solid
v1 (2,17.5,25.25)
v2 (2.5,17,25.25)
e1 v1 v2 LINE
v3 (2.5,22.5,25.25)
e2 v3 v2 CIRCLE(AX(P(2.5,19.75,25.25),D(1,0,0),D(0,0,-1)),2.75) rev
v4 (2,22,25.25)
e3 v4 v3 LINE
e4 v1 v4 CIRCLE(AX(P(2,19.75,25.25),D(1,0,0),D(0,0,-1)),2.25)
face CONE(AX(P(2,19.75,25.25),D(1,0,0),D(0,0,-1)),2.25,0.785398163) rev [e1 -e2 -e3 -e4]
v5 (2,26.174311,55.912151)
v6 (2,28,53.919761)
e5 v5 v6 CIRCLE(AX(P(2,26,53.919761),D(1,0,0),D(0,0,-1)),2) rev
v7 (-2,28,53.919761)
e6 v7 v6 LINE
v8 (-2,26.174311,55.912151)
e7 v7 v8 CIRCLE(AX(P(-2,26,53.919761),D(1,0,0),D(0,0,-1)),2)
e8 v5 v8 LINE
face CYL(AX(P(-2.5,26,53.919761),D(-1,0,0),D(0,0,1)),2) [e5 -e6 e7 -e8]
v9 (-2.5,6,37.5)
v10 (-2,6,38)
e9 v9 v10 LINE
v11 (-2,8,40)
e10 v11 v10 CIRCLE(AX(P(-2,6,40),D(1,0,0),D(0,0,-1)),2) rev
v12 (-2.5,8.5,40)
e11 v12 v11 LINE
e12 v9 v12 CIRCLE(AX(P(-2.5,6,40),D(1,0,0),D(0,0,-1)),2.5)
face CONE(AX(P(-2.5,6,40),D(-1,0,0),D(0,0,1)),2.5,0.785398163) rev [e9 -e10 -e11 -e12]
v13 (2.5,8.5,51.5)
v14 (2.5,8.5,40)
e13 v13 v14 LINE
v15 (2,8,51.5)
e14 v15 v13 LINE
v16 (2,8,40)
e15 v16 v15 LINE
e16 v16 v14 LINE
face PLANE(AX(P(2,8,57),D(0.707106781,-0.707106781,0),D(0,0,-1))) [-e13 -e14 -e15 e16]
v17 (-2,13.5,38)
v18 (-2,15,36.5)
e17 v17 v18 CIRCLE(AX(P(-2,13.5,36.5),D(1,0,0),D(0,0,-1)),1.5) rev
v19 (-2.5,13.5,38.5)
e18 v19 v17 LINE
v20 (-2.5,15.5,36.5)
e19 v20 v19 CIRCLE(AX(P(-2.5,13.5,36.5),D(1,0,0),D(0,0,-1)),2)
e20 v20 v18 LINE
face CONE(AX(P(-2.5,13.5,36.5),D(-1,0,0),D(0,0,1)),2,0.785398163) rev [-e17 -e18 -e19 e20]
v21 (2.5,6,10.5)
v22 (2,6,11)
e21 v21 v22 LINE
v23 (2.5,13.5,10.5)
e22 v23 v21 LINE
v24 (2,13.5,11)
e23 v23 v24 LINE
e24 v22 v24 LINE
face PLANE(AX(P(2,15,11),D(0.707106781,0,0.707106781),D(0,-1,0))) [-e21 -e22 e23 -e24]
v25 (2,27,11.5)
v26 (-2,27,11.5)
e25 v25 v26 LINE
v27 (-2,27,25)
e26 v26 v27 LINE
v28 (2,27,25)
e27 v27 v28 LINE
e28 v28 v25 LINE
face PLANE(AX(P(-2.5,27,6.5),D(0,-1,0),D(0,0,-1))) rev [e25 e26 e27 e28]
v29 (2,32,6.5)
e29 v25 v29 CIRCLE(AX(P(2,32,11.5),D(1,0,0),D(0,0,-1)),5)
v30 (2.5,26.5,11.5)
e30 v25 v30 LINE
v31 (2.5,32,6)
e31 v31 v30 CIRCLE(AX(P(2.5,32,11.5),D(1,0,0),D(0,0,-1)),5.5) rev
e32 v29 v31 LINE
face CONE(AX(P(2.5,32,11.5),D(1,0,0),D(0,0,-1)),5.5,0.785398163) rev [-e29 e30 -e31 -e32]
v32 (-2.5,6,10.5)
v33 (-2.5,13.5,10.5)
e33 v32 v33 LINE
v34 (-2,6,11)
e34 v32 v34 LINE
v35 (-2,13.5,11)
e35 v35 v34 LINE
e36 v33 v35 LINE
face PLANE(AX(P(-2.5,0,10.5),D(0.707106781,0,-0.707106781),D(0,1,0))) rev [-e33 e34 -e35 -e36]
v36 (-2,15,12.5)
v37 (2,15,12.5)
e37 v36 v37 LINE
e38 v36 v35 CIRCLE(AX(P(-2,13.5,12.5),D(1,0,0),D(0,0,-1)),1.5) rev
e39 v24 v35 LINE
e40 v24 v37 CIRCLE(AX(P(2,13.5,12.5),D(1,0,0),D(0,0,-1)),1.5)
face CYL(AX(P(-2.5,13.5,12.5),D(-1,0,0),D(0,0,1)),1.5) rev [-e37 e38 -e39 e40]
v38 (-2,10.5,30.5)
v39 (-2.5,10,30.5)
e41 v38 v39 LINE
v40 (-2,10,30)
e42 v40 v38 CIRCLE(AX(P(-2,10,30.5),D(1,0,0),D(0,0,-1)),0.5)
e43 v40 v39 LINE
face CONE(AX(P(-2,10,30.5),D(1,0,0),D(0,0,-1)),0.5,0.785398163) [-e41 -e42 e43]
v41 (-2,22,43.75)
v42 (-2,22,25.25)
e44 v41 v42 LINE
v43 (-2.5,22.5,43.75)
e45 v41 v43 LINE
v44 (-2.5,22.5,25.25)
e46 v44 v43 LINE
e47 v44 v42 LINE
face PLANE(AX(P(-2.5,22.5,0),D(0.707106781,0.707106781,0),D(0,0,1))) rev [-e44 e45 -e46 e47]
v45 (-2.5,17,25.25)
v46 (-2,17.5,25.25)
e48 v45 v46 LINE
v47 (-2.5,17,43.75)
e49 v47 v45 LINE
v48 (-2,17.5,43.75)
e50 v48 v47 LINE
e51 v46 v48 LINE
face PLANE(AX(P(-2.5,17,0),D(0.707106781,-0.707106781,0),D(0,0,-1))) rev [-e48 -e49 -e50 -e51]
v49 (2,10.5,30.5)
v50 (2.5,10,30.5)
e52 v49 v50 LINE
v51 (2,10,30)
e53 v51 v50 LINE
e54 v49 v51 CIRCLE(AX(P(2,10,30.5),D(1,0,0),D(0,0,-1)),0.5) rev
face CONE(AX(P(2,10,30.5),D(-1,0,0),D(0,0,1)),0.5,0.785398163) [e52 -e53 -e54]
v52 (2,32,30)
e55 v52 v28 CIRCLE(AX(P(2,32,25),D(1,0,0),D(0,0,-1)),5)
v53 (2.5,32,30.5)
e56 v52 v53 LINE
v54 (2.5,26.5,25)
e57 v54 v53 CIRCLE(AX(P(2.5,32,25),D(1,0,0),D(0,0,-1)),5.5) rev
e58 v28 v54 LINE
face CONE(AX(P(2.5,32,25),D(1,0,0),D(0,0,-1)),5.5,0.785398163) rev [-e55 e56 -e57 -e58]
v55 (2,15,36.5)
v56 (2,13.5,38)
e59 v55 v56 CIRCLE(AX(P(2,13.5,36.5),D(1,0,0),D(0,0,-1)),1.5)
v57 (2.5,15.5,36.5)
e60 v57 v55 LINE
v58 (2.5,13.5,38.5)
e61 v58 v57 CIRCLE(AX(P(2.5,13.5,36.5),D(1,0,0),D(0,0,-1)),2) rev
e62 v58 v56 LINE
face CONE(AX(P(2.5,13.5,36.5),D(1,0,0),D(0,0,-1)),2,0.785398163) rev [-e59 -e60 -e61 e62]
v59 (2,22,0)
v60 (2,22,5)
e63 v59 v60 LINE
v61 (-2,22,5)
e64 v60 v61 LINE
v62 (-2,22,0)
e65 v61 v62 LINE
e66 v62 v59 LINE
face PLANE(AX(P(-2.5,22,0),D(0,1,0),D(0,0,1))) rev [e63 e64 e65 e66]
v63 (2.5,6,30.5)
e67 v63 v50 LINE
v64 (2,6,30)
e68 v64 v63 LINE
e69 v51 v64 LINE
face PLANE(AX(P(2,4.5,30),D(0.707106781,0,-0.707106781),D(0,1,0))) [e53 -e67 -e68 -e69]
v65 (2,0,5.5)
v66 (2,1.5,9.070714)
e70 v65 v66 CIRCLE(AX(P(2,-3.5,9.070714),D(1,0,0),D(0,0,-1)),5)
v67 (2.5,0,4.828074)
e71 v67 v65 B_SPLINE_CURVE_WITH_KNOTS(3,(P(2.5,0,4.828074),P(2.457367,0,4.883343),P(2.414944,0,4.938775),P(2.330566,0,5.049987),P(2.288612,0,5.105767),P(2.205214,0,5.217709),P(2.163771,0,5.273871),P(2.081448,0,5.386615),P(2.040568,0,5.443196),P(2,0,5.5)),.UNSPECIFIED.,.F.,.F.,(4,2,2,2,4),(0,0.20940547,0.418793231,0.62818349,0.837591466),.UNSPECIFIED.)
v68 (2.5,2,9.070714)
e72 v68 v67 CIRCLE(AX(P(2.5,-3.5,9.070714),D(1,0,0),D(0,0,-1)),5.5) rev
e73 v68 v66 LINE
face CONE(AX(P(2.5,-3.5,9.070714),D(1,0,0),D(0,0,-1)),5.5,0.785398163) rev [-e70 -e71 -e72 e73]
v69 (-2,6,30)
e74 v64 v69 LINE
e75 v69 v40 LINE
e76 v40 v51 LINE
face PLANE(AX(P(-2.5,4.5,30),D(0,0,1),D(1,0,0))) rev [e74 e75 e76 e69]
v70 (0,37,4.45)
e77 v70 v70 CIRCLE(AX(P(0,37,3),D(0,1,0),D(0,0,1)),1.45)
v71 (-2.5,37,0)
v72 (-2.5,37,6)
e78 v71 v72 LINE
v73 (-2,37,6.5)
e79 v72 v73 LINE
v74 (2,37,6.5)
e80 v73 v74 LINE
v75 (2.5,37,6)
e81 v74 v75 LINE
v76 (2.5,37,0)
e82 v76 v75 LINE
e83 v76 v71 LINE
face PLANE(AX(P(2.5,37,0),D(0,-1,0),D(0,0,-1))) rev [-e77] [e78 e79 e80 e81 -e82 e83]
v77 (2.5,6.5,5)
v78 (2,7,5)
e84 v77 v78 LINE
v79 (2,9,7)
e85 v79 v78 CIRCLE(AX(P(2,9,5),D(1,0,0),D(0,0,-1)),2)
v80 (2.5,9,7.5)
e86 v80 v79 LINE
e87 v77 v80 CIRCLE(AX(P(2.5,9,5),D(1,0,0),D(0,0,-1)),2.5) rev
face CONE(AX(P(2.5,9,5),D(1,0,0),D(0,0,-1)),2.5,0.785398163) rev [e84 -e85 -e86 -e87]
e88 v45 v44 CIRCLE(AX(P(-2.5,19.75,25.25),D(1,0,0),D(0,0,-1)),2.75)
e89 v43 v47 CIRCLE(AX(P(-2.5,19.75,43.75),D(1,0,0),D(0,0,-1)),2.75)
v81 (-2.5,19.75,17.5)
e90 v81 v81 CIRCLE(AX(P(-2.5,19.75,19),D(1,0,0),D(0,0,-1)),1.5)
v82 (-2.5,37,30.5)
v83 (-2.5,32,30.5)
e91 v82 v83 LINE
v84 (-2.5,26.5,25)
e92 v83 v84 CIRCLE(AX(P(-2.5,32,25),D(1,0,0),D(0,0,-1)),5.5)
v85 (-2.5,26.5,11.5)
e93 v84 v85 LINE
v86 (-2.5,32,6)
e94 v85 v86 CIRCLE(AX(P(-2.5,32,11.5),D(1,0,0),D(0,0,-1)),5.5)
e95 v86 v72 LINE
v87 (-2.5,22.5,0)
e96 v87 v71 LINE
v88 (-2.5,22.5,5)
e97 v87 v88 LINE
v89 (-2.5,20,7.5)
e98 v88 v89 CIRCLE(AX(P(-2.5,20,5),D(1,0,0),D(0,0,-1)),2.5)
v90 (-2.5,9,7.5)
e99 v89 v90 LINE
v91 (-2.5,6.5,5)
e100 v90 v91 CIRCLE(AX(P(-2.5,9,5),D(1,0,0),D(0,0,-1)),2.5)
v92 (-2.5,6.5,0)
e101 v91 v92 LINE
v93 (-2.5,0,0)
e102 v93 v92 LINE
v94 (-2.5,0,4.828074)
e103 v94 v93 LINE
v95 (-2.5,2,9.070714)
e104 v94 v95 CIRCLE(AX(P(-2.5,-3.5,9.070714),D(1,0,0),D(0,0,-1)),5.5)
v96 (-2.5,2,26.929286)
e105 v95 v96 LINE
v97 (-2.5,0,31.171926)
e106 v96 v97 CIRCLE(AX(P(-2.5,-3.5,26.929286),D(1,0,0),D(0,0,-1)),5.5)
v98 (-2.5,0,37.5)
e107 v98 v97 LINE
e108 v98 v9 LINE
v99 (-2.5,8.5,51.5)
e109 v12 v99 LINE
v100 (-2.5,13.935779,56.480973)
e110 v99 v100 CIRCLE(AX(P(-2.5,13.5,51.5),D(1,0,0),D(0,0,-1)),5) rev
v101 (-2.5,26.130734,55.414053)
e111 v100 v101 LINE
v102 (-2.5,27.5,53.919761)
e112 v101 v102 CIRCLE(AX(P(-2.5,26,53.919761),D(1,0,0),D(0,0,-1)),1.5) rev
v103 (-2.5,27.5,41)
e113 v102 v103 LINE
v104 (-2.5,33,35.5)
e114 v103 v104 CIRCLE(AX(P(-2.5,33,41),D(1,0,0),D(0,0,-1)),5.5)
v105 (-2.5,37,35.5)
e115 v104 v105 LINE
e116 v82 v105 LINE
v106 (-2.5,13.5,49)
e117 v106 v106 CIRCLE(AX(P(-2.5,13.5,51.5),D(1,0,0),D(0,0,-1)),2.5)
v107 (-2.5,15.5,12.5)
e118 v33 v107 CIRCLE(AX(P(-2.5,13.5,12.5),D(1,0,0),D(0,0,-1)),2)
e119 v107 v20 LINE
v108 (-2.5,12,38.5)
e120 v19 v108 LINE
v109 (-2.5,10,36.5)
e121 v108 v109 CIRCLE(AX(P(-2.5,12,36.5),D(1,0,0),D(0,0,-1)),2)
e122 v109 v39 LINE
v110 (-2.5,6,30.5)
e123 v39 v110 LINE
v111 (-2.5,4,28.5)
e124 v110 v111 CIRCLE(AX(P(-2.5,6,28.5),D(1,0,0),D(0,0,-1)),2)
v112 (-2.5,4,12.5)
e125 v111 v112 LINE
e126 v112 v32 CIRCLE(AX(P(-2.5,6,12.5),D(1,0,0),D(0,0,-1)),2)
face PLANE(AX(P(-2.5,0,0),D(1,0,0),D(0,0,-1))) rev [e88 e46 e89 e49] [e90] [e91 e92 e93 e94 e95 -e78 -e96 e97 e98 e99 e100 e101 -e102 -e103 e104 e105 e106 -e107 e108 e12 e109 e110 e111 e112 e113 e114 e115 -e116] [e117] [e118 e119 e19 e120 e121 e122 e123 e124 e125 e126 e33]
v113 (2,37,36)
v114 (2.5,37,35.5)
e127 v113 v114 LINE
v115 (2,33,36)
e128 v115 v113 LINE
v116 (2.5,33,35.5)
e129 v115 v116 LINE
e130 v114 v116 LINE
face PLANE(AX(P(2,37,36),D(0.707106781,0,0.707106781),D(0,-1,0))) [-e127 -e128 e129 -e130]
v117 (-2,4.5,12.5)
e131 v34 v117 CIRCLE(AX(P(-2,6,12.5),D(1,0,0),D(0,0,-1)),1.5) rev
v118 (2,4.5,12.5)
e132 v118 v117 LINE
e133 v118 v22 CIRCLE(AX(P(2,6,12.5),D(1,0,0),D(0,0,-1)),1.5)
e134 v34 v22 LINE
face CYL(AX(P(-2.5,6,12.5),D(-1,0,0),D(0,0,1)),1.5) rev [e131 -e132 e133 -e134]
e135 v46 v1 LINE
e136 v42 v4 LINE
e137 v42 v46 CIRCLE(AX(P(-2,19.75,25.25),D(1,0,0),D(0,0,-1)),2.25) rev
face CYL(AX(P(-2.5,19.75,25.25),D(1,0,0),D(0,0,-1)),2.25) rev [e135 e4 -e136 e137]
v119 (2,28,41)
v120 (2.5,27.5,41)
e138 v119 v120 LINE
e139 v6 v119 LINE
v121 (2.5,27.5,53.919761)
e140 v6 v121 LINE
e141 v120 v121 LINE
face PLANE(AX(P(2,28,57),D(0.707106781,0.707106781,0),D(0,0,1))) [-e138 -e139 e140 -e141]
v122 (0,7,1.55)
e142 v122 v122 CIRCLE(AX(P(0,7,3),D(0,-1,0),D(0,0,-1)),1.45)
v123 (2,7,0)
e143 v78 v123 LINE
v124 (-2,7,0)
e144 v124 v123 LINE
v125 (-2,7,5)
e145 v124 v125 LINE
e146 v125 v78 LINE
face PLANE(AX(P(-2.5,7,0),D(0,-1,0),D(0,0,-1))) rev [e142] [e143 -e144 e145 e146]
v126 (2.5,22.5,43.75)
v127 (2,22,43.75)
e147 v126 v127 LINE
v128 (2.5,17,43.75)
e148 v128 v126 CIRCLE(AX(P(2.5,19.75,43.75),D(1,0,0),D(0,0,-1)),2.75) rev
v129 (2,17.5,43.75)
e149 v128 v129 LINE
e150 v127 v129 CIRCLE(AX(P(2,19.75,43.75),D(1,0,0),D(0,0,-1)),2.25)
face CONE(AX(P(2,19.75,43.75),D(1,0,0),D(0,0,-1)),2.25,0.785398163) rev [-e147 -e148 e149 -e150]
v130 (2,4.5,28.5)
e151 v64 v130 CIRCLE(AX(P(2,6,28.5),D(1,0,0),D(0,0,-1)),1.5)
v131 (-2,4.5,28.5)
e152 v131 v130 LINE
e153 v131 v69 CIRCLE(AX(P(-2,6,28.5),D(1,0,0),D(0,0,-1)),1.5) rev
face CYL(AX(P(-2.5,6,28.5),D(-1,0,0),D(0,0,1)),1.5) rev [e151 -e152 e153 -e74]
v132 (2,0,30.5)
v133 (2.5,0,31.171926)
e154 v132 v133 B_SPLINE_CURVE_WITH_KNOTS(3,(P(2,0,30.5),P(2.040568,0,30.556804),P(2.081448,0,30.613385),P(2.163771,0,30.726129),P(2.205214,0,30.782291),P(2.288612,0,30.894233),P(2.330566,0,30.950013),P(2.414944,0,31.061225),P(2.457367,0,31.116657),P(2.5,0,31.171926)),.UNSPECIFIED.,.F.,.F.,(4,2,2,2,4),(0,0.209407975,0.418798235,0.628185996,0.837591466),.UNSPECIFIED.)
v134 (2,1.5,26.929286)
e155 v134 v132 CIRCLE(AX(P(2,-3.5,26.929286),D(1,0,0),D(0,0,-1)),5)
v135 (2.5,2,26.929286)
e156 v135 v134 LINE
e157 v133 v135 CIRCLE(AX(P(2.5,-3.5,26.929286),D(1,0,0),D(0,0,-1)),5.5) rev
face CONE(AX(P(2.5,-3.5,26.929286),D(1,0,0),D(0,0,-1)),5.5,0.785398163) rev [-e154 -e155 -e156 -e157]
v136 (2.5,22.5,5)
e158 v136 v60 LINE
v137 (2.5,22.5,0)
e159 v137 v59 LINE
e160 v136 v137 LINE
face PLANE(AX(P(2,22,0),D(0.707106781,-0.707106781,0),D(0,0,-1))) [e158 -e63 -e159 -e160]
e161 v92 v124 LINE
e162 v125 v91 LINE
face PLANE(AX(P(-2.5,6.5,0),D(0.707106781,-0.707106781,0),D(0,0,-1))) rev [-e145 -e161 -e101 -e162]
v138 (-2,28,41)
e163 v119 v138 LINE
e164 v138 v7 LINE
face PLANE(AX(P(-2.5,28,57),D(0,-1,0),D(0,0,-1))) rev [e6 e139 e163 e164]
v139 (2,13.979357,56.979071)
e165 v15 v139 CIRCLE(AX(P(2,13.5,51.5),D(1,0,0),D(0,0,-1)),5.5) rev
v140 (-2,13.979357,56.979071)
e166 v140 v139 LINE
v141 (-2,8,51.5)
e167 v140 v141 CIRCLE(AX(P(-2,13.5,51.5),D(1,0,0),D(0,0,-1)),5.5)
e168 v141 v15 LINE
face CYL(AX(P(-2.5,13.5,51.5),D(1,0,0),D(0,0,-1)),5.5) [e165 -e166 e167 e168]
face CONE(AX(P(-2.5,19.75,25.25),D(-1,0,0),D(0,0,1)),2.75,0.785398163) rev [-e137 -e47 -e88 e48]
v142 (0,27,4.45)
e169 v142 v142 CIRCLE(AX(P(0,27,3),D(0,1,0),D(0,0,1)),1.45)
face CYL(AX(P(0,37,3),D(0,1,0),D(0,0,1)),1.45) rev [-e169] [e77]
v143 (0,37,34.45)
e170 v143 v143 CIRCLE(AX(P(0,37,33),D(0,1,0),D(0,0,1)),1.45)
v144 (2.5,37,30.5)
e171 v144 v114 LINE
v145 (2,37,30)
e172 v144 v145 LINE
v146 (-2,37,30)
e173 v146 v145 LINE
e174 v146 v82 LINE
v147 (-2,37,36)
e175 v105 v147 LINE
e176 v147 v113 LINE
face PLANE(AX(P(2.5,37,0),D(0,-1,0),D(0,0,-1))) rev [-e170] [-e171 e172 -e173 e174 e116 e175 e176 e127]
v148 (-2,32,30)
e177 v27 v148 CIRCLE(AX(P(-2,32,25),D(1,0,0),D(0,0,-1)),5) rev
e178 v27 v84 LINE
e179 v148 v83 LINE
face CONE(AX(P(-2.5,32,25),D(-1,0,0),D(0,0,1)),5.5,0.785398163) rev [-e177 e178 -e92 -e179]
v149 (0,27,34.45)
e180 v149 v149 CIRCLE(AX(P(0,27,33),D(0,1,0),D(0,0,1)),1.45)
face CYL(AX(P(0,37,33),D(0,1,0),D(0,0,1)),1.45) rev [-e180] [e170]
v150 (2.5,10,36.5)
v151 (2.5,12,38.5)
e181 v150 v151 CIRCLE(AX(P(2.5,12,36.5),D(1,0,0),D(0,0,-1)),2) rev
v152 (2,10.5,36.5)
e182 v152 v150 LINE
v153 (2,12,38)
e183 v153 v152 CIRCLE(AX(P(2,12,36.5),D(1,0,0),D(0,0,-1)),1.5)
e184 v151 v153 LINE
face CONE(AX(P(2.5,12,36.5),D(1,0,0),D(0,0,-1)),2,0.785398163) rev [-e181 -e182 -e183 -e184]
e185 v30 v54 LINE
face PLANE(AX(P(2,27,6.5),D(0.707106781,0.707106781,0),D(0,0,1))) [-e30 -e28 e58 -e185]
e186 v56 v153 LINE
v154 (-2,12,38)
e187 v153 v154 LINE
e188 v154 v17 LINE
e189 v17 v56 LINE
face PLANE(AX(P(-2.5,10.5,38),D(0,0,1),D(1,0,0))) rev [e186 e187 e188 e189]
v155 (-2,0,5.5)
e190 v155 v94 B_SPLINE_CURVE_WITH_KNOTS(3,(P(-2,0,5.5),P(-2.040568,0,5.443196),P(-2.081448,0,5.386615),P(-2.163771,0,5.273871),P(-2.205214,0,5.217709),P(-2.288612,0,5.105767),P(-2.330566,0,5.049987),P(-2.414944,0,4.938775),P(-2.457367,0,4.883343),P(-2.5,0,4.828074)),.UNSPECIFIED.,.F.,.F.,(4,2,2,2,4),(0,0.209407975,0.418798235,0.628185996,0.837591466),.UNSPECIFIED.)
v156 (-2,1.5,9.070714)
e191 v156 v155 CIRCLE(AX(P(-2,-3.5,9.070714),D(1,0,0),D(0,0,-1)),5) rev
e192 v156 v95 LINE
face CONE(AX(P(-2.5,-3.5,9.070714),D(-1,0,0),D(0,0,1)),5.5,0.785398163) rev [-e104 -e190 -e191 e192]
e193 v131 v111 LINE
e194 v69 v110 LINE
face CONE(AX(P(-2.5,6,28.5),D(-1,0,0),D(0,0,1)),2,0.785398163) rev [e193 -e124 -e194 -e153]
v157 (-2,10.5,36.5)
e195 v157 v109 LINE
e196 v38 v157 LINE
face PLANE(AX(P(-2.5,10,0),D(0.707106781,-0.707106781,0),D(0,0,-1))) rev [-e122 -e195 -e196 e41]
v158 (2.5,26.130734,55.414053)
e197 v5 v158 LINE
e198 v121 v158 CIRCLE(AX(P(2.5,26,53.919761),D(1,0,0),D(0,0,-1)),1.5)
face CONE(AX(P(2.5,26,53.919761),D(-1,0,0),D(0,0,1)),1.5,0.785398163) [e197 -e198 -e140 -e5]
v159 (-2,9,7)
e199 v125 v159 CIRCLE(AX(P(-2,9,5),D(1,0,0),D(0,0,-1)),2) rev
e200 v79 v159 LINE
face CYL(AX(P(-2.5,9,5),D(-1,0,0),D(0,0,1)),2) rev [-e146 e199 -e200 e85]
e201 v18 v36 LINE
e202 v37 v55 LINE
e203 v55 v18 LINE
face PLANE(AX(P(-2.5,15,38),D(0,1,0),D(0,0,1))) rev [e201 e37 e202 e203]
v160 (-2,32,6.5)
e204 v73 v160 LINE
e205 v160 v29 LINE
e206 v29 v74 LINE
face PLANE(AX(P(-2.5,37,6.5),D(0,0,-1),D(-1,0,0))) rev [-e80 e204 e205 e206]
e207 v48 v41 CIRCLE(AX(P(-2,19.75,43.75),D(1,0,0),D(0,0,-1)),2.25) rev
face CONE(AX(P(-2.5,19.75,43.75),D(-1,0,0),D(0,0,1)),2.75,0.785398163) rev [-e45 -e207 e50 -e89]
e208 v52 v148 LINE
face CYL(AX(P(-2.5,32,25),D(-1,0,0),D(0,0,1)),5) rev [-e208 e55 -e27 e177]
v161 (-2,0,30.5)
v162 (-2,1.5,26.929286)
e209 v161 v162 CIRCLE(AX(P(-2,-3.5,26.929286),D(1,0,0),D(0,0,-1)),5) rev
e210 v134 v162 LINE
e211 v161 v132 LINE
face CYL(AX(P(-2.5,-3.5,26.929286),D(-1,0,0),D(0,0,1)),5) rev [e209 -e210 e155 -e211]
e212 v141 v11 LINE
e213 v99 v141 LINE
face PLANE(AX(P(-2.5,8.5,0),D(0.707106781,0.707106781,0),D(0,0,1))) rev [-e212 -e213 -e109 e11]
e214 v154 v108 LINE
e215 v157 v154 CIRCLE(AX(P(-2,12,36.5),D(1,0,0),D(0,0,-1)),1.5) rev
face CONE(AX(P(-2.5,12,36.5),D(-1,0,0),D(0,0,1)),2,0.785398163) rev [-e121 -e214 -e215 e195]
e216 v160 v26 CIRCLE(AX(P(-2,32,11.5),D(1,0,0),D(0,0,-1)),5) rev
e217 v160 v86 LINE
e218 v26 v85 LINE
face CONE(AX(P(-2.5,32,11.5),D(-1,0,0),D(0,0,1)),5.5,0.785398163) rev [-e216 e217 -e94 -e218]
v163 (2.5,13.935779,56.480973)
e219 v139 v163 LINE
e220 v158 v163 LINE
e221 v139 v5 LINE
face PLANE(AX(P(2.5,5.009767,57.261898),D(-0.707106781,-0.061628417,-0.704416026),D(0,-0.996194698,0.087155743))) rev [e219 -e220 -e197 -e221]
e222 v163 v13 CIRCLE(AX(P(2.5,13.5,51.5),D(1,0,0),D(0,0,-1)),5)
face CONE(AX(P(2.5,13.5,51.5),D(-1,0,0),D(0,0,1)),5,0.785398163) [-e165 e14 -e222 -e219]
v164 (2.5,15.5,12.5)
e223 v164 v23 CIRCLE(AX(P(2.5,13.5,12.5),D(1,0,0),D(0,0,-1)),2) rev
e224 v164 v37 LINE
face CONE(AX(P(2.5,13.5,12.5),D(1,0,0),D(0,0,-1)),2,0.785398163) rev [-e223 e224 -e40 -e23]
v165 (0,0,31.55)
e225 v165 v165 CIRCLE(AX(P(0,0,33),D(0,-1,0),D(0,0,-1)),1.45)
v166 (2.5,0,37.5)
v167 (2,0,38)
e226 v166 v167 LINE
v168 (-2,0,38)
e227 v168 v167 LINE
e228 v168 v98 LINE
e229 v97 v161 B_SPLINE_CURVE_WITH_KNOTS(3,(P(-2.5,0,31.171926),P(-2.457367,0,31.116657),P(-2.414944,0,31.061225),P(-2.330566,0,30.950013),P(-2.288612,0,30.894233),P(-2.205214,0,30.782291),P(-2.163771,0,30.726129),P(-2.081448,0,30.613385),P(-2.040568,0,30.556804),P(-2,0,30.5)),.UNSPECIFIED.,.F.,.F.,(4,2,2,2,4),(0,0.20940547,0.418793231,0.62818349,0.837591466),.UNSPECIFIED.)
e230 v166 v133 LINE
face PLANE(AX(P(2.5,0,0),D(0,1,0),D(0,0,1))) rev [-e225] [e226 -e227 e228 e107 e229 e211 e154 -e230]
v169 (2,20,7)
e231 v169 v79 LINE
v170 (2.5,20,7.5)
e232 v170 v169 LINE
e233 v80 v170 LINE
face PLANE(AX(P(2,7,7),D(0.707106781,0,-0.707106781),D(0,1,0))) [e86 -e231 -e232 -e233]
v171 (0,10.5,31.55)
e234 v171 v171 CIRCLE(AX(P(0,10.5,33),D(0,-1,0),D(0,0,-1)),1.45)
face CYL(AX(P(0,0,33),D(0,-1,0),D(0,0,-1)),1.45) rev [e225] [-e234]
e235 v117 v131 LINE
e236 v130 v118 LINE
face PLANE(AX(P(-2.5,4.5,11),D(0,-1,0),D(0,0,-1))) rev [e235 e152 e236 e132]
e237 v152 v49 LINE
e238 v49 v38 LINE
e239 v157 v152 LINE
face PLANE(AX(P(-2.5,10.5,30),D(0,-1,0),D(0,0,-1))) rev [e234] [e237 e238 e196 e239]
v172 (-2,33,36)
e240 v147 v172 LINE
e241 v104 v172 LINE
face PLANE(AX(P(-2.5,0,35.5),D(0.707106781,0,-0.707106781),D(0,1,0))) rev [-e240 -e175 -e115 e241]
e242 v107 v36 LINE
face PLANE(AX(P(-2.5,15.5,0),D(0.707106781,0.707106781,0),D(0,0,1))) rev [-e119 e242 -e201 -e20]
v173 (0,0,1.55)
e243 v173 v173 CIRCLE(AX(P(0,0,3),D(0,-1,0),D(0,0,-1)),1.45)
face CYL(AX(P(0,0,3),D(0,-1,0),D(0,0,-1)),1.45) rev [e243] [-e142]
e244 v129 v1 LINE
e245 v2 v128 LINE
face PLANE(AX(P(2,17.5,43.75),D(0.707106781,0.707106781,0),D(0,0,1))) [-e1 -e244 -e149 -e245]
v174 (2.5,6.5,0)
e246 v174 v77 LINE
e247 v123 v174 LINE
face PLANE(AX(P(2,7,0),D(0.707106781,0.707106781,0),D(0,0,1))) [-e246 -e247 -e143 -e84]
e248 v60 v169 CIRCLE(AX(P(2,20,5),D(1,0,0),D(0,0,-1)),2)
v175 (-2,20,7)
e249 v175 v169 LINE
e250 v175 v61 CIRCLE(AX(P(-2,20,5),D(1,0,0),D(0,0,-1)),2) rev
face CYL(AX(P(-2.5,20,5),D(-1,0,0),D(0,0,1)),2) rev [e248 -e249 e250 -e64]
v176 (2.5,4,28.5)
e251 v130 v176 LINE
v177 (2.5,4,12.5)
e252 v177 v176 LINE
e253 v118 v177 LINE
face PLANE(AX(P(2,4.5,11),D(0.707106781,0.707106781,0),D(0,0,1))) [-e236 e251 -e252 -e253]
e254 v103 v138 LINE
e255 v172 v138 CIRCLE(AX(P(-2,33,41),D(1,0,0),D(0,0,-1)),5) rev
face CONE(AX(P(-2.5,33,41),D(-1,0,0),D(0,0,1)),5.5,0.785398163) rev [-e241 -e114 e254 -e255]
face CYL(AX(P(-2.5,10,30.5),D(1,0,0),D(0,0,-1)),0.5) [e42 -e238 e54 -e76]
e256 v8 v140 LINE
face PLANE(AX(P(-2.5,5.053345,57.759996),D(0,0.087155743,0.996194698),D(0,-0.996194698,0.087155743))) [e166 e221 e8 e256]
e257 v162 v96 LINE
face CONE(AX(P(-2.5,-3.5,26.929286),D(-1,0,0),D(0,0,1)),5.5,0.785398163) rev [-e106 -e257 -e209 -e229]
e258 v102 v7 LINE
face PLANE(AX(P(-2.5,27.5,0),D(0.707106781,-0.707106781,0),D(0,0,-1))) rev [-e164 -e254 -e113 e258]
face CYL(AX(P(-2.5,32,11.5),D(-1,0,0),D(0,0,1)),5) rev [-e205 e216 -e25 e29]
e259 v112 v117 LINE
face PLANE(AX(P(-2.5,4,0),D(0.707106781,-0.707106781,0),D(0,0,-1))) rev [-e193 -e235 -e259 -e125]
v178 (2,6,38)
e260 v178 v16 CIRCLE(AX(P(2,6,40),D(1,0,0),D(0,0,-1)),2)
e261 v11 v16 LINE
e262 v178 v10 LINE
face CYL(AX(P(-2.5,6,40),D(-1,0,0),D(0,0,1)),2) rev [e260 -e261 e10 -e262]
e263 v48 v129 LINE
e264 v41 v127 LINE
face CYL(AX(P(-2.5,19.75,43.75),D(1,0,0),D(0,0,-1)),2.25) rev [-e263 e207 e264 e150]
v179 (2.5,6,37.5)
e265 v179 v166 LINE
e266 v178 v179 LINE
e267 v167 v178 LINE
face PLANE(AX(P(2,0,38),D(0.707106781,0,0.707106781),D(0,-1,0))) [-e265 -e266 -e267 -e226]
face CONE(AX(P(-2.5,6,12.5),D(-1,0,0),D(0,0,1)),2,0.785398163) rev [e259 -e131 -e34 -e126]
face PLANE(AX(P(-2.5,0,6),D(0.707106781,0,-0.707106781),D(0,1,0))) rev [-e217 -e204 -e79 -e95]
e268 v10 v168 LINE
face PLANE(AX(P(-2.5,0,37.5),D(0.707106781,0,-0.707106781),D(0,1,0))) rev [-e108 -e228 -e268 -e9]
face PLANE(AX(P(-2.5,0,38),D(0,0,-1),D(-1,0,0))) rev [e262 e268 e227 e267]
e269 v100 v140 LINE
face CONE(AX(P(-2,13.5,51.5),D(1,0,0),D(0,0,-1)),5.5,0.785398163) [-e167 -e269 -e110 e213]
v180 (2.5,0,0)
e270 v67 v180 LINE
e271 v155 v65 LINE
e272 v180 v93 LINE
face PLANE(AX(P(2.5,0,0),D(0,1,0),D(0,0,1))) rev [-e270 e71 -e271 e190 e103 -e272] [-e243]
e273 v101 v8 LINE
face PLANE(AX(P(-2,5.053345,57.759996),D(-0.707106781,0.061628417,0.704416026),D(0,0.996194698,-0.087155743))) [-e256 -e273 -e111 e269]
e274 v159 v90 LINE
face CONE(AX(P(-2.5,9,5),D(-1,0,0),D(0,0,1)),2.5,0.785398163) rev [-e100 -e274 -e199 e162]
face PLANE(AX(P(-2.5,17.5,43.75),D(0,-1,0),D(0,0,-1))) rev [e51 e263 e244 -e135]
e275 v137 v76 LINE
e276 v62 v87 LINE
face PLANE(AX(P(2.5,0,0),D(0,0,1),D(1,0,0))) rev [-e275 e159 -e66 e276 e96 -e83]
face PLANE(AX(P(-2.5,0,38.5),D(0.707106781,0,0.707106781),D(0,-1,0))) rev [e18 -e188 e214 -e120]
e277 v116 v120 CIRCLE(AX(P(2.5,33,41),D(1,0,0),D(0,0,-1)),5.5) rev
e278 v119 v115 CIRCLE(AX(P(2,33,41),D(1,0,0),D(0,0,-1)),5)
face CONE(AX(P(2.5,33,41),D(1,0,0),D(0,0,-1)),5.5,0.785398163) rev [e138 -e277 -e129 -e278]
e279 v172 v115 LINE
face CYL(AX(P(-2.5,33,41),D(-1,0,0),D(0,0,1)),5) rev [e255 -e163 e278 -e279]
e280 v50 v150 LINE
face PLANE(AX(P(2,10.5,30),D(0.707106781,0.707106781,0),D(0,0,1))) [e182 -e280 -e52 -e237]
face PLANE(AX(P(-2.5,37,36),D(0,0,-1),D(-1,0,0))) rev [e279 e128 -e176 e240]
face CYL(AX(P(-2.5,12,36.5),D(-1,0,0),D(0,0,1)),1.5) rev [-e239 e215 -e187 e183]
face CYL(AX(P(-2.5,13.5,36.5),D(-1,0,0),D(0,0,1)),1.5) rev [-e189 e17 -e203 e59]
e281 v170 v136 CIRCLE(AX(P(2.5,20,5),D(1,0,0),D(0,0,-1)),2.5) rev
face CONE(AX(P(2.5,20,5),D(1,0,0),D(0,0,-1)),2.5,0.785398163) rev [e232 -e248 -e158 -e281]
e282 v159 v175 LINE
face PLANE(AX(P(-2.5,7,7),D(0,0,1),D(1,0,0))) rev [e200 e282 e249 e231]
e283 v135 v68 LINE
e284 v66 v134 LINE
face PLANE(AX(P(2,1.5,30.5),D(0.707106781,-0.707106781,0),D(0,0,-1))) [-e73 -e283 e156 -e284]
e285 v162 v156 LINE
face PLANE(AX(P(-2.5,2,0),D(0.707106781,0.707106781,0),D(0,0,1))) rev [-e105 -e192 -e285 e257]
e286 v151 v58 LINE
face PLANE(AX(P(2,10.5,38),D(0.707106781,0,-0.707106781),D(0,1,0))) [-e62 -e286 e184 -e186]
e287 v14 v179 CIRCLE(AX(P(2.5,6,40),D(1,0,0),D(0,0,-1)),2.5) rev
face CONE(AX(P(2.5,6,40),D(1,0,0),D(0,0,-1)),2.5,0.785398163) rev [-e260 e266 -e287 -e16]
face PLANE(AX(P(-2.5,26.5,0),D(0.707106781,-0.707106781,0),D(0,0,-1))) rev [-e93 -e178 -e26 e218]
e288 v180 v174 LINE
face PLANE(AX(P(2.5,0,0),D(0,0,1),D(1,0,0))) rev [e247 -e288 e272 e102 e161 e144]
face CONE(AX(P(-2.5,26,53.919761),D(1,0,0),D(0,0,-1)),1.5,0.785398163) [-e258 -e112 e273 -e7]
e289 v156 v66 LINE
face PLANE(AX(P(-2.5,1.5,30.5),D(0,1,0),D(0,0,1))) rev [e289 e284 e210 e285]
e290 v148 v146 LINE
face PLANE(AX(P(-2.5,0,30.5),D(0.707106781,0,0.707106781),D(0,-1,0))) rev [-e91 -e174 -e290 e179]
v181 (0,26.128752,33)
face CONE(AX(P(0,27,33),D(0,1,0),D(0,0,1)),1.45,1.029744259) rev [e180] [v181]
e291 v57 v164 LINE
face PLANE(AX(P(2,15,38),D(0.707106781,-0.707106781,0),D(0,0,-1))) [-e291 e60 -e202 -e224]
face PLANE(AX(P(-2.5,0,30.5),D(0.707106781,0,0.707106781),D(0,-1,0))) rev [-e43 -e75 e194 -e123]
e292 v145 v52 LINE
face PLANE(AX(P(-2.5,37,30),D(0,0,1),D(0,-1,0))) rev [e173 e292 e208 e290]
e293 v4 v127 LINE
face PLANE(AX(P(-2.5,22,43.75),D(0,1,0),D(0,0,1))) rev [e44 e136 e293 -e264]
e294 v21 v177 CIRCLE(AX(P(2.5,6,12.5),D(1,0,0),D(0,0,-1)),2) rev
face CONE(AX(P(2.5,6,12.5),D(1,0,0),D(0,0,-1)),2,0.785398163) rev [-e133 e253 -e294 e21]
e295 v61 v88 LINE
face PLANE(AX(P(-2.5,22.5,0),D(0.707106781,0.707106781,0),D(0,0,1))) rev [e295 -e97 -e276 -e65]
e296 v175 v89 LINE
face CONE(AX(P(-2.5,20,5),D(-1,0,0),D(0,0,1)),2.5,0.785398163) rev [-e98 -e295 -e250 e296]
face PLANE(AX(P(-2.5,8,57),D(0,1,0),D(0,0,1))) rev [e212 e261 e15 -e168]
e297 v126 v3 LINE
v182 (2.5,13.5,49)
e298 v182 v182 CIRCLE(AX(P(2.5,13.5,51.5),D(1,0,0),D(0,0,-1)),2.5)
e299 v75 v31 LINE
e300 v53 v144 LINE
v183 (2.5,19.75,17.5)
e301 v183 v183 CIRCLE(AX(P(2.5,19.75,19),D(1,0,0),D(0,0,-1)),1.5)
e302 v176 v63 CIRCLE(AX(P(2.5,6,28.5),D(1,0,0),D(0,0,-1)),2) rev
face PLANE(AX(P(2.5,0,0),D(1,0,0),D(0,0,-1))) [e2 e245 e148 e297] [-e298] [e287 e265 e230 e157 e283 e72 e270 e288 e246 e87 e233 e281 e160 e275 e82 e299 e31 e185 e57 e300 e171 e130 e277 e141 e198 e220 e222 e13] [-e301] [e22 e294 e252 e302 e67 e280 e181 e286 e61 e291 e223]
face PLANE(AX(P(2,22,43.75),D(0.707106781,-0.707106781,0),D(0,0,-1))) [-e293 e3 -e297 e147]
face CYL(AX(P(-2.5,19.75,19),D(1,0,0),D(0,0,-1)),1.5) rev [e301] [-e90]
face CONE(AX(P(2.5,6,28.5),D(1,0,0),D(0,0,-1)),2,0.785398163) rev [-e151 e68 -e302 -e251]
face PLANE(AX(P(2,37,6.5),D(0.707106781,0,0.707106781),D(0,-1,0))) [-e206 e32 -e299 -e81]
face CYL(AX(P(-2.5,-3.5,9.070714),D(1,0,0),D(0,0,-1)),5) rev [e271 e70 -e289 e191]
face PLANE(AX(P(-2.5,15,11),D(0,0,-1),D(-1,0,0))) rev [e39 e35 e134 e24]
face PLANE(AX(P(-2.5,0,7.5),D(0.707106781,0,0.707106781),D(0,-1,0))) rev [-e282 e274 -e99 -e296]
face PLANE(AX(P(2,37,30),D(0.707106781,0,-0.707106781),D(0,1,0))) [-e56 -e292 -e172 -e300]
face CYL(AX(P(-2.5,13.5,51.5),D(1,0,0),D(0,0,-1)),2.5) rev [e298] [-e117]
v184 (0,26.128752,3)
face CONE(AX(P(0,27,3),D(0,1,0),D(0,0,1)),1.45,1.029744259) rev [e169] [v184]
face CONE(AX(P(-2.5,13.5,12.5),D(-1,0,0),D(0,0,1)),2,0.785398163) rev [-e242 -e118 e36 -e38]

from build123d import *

# Parameters (mm, degrees)
ESQUISSE1_W             = 57
ESQUISSE1_H             = 37
BOSS_EXTRU_1_DEPTH      = 2.5
ESQUISSE2_W             = 7
ESQUISSE2_H             = 15
ENL_V_MAT_EXTRU_1_DEPTH = 69.139562664
ESQUISSE3_W             = 23.5
ESQUISSE3_H             = 10
ENL_V_MAT_EXTRU_2_DEPTH = 69.139562664
ESQUISSE4_W             = 21
ESQUISSE4_H             = 9
ENL_V_MAT_EXTRU_3_DEPTH = 69.139562664
ESQUISSE5_W             = 19
ESQUISSE5_H             = 8
ENL_V_MAT_EXTRU_4_DEPTH = 69.139562664
ESQUISSE6_R             = 2.5
ENL_V_MAT_EXTRU_5_DEPTH = 5
ENL_V_MAT_EXTRU_6_DEPTH = 69.139562664
ESQUISSE8_R             = 1.5
ENL_V_MAT_EXTRU_7_DEPTH = 69.139562664
ESQUISSE9_W             = 25
ESQUISSE9_H             = 1.5
ENL_V_MAT_EXTRU_8_DEPTH = 69.139562664
CONG_1_R                = 5
CONG_2_R                = 1.5
CONG_3_R                = 0.5
CONG_4_R                = 2
CONG_5_R                = 2
TROU_TARAUD_M3_51_D     = 2.9
TROU_TARAUD_M3_51_DEPTH = 12
TROU_TARAUD_M3_51_TIP   = 0.871247898
TROU_TARAUD_M3_52_D     = 2.9
TROU_TARAUD_M3_52_DEPTH = 10
TROU_TARAUD_M3_52_TIP   = 0.871247898
CHANFREIN1_SIZE         = 0.5


with BuildPart() as part:
    # Esquisse1 → Boss.-Extru.1 (new, symmetric)
    with BuildSketch(Plane(origin=(0, 0, 0), x_dir=(0, 0, -1), z_dir=(1, 0, 0))):
        with Locations((-28.5, 18.5)):
            Rectangle(ESQUISSE1_W, ESQUISSE1_H)
    extrude(amount=BOSS_EXTRU_1_DEPTH, both=True)

    # Esquisse2 → Enlèv. mat.-Extru.1 (cut, through all)
    with BuildSketch(Plane(origin=(2.5, 0, 0), x_dir=(0, 0, -1), z_dir=(1, 0, 0))):
        with Locations((-3.5, 14.5)):
            Rectangle(ESQUISSE2_W, ESQUISSE2_H)
    extrude(amount=-ENL_V_MAT_EXTRU_1_DEPTH, mode=Mode.SUBTRACT)

    # Esquisse3 → Enlèv. mat.-Extru.2 (cut, through all)
    with BuildSketch(Plane(origin=(2.5, 0, 0), x_dir=(0, 0, -1), z_dir=(1, 0, 0))):
        with Locations((-18.25, 32)):
            Rectangle(ESQUISSE3_W, ESQUISSE3_H)
    extrude(amount=-ENL_V_MAT_EXTRU_2_DEPTH, mode=Mode.SUBTRACT)

    # Esquisse4 → Enlèv. mat.-Extru.3 (cut, through all)
    with BuildSketch(Plane(origin=(2.5, 0, 0), x_dir=(0, 0, -1), z_dir=(1, 0, 0))):
        with Locations((-46.5, 32.5)):
            Rectangle(ESQUISSE4_W, ESQUISSE4_H)
    extrude(amount=-ENL_V_MAT_EXTRU_3_DEPTH, mode=Mode.SUBTRACT)

    # Esquisse5 → Enlèv. mat.-Extru.4 (cut, through all)
    with BuildSketch(Plane(origin=(2.5, 0, 0), x_dir=(0, 0, -1), z_dir=(1, 0, 0))):
        with Locations((-47.5, 4)):
            Rectangle(ESQUISSE5_W, ESQUISSE5_H)
    extrude(amount=-ENL_V_MAT_EXTRU_4_DEPTH, mode=Mode.SUBTRACT)

    # Esquisse6 → Enlèv. mat.-Extru.5 (cut)
    with BuildSketch(Plane(origin=(2.5, 0, 0), x_dir=(0, 0, -1), z_dir=(1, 0, 0))):
        with BuildLine():
            Line((-57, 28), (-57, 13.5))
            ThreePointArc((-57, 13.5), (-56.994765219, 13.739906631), (-56.97907084, 13.979356585))
            Line((-56.97907084, 13.979356585), (-55.752423485, 28))
            Line((-55.752423485, 28), (-57, 28))
        make_face()
        with BuildLine():
            Line((-57, 8), (-51.5, 8))
            ThreePointArc((-51.5, 8), (-55.389087297, 9.610912703), (-57, 13.5))
            Line((-57, 13.5), (-57, 8))
        make_face()
        with Locations((-51.5, 13.5)):
            Circle(ESQUISSE6_R)
    extrude(amount=-ENL_V_MAT_EXTRU_5_DEPTH, mode=Mode.SUBTRACT)

    # Esquisse7 → Enlèv. mat.-Extru.6 (cut, through all)
    with BuildSketch(Plane(origin=(2.5, 0, 0), x_dir=(0, 0, -1), z_dir=(1, 0, 0))):
        Polygon((-38, 15), (-11, 15), (-11, 4.5), (-30, 4.5), (-30, 10.5), (-38, 10.5), align=None)
    extrude(amount=-ENL_V_MAT_EXTRU_6_DEPTH, mode=Mode.SUBTRACT)

    # Esquisse8 → Enlèv. mat.-Extru.7 (cut, through all)
    with BuildSketch(Plane(origin=(2.5, 0, 0), x_dir=(0, 0, -1), z_dir=(1, 0, 0))):
        with Locations((-19, 19.75)):
            Circle(ESQUISSE8_R)
        with BuildLine():
            Line((-43.75, 22), (-25.25, 22))
            ThreePointArc((-25.25, 22), (-23, 19.75), (-25.25, 17.5))
            Line((-25.25, 17.5), (-43.75, 17.5))
            ThreePointArc((-43.75, 17.5), (-46, 19.75), (-43.75, 22))
        make_face()
    extrude(amount=-ENL_V_MAT_EXTRU_7_DEPTH, mode=Mode.SUBTRACT)

    # Esquisse9 → Enlèv. mat.-Extru.8 (cut, through all)
    with BuildSketch(Plane(origin=(2.5, 0, 0), x_dir=(0, 0, -1), z_dir=(1, 0, 0))):
        with Locations((-18, 0.75)):
            Rectangle(ESQUISSE9_W, ESQUISSE9_H)
    extrude(amount=-ENL_V_MAT_EXTRU_8_DEPTH, mode=Mode.SUBTRACT)

    # Congé1
    # the kernel refuses this fillet: 5 mm, written as the material it adds along each edge
    with BuildSketch(Plane(origin=(2.5, 27, 30), x_dir=(0, 0, -1), z_dir=(-1, 0, 0)), Plane(origin=(2.5, 28, 36), x_dir=(0, 1, 0), z_dir=(-1, 0, 0)), Plane(origin=(2.5, 27, 6.5), x_dir=(0, 1, 0), z_dir=(-1, 0, 0))) as cong_1_piece_1:
        with BuildLine():
            CenterArc((CONG_1_R, -CONG_1_R), CONG_1_R, 90, 90)
            Line((0, -CONG_1_R), (-CONG_1_R * 0.02, -CONG_1_R))
            Line((-CONG_1_R * 0.02, -CONG_1_R), (-CONG_1_R * 0.02, CONG_1_R * 0.02))
            Line((-CONG_1_R * 0.02, CONG_1_R * 0.02), (CONG_1_R, CONG_1_R * 0.02))
            Line((CONG_1_R, CONG_1_R * 0.02), (CONG_1_R, 0))
        make_face()
    extrude(amount=5)
    with BuildSketch(Plane(origin=(2.5, 1.5, 5.5), x_dir=(0, -1, 0), z_dir=(-1, 0, 0))) as cong_1_piece_2:
        with BuildLine():
            CenterArc((5, 3.570714214), CONG_1_R, 180, 45.572995999)
            Line((0, 3.570714214), (-0.1, 3.570714214))
            Line((-0.1, 3.570714214), (-0.1, 0))
            Line((-0.1, 0), (0, -0.1))
            ThreePointArc((0, -0.1), (0.75, -0.1), (1.43, -0.071414284))
            Line((1.43, -0.071414284), (1.5, 0))
        make_face()
    extrude(amount=5)
    with BuildSketch(Plane(origin=(2.5, 1.5, 30.5), x_dir=(0, -1, 0), z_dir=(-1, 0, 0))) as cong_1_piece_3:
        with BuildLine():
            CenterArc((5, -3.570714214), CONG_1_R, 134.427004001, 45.572995999)
            Line((0, -3.570714214), (-0.1, -3.570714214))
            Line((-0.1, -3.570714214), (-0.1, 0))
            Line((-0.1, 0), (0, 0.1))
            ThreePointArc((0, 0.1), (0.75, 0.1), (1.43, 0.071414284))
            Line((1.43, 0.071414284), (1.5, 0))
        make_face()
    extrude(amount=5)

    # Congé2
    cong_2_edges = [part.edges().sort_by_distance(p)[0] for p in [
        (0, 10.5, 38),
        (0, 15, 38),
        (0, 15, 11),
        (0, 4.5, 11),
        (0, 4.5, 30),
    ]]
    fillet(cong_2_edges, radius=CONG_2_R)

    # Congé3
    cong_3_edges = [part.edges().sort_by_distance(p)[0] for p in [
        (0, 10.5, 30),
    ]]
    fillet(cong_3_edges, radius=CONG_3_R)

    # Congé4
    cong_4_edges = [part.edges().sort_by_distance(p)[0] for p in [
        (0, 7, 7),
        (0, 22, 7),
        (0, 8, 38),
    ]]
    fillet(cong_4_edges, radius=CONG_4_R)

    # Congé5
    cong_5_edges = [part.edges().sort_by_distance(p)[0] for p in [
        (0, 28, 55.752423485),
    ]]
    fillet(cong_5_edges, radius=CONG_5_R)

    # Trou taraudé M3.51
    with Locations(Plane(origin=(0, 0, 0), x_dir=(-1, 0, 0), z_dir=(0, -1, 0))):
        with Locations((0, -3), (0, -33)):
            Hole(TROU_TARAUD_M3_51_D / 2, depth=TROU_TARAUD_M3_51_DEPTH)
            with Locations((0, 0, -(TROU_TARAUD_M3_51_DEPTH + TROU_TARAUD_M3_51_TIP / 2))):  # 118° drill point
                Cone(0, TROU_TARAUD_M3_51_D / 2, TROU_TARAUD_M3_51_TIP, mode=Mode.SUBTRACT)

    # Trou taraudé M3.52
    with Locations(Plane(origin=(0, 37, 0), x_dir=(1, 0, 0), z_dir=(0, 1, 0))):
        with Locations((0, -33), (0, -3)):
            Hole(TROU_TARAUD_M3_52_D / 2, depth=TROU_TARAUD_M3_52_DEPTH)
            with Locations((0, 0, -(TROU_TARAUD_M3_52_DEPTH + TROU_TARAUD_M3_52_TIP / 2))):  # 118° drill point
                Cone(0, TROU_TARAUD_M3_52_D / 2, TROU_TARAUD_M3_52_TIP, mode=Mode.SUBTRACT)

    # Chanfrein1
    chanfrein1_edges = [part.edges().sort_by_distance(p)[0] for p in [
        (-2.5, 19.75, 46),
        (-2.5, 22, 34.5),
        (-2.5, 19.75, 23),
        (-2.5, 17.5, 34.5),
        (2.5, 19.75, 46),
        (2.5, 17.5, 34.5),
        (2.5, 19.75, 23),
        (2.5, 22, 34.5),
        (2.5, 1.5, 18),
        (-2.5, 1.5, 18),
        (2.5, 35, 36),
        (-2.5, 35, 36),
        (2.5, 34.5, 6.5),
        (-2.5, 34.5, 6.5),
        (2.5, 27, 18.25),
        (-2.5, 27, 18.25),
        (2.5, 1.109772229, 7.134222541),
        (-2.5, 1.109772229, 7.134222541),
        (2.5, 1.109772229, 28.865777459),
        (-2.5, 1.109772229, 28.865777459),
        (2.5, 29.464466094, 37.464466094),
        (-2.5, 29.464466094, 37.464466094),
        (2.5, 28.464466094, 7.964466094),
        (-2.5, 28.464466094, 7.964466094),
        (2.5, 28.464466094, 28.535533906),
        (-2.5, 28.464466094, 28.535533906),
        (2.5, 15, 24.5),
        (-2.5, 15, 24.5),
        (-2.5, 22, 2.5),
        (2.5, 9.75, 11),
        (-2.5, 9.75, 11),
        (2.5, 4.5, 20.5),
        (-2.5, 4.5, 20.5),
        (2.5, 10.5, 33.5),
        (2.5, 22, 2.5),
        (-2.5, 10.5, 33.5),
        (2.5, 12.75, 38),
        (-2.5, 12.75, 38),
        (2.5, 14.560660172, 11.439339828),
        (-2.5, 14.560660172, 11.439339828),
        (2.5, 4.939339828, 11.439339828),
        (-2.5, 4.939339828, 11.439339828),
        (2.5, 4.939339828, 29.560660172),
        (-2.5, 4.939339828, 29.560660172),
        (2.5, 10.939339828, 37.560660172),
        (-2.5, 10.939339828, 37.560660172),
        (2.5, 14.560660172, 37.560660172),
        (-2.5, 14.560660172, 37.560660172),
        (2.5, 8, 30),
        (-2.5, 8, 30),
        (2.5, 10.353553391, 30.146446609),
        (-2.5, 10.353553391, 30.146446609),
        (2.5, 7, 2.5),
        (-2.5, 7, 2.5),
        (2.5, 14.5, 7),
        (-2.5, 14.5, 7),
        (-2.5, 8, 45.75),
        (2.5, 8, 45.75),
        (2.5, 7.585786438, 6.414213562),
        (-2.5, 7.585786438, 6.414213562),
        (2.5, 21.414213562, 6.414213562),
        (-2.5, 21.414213562, 6.414213562),
        (2.5, 7.414213562, 38.585786438),
        (-2.5, 7.414213562, 38.585786438),
        (2.5, 28, 47.459880569),
        (-2.5, 28, 47.459880569),
        (2.5, 20.076834035, 56.445610687),
        (2.5, 27.474554674, 55.270941553),
        (-2.5, 20.076834035, 56.445610687),
        (-2.5, 27.474554674, 55.270941553),
        (-2.5, 34.5, 30),
        (2.5, 34.5, 30),
        (-2.5, 3, 38),
        (2.5, 3, 38),
        (2.5, 9.784253858, 55.555025352),
        (-2.5, 9.784253858, 55.555025352),
    ]]
    chamfer(chanfrein1_edges, length=CHANFREIN1_SIZE)


solid = part.part
